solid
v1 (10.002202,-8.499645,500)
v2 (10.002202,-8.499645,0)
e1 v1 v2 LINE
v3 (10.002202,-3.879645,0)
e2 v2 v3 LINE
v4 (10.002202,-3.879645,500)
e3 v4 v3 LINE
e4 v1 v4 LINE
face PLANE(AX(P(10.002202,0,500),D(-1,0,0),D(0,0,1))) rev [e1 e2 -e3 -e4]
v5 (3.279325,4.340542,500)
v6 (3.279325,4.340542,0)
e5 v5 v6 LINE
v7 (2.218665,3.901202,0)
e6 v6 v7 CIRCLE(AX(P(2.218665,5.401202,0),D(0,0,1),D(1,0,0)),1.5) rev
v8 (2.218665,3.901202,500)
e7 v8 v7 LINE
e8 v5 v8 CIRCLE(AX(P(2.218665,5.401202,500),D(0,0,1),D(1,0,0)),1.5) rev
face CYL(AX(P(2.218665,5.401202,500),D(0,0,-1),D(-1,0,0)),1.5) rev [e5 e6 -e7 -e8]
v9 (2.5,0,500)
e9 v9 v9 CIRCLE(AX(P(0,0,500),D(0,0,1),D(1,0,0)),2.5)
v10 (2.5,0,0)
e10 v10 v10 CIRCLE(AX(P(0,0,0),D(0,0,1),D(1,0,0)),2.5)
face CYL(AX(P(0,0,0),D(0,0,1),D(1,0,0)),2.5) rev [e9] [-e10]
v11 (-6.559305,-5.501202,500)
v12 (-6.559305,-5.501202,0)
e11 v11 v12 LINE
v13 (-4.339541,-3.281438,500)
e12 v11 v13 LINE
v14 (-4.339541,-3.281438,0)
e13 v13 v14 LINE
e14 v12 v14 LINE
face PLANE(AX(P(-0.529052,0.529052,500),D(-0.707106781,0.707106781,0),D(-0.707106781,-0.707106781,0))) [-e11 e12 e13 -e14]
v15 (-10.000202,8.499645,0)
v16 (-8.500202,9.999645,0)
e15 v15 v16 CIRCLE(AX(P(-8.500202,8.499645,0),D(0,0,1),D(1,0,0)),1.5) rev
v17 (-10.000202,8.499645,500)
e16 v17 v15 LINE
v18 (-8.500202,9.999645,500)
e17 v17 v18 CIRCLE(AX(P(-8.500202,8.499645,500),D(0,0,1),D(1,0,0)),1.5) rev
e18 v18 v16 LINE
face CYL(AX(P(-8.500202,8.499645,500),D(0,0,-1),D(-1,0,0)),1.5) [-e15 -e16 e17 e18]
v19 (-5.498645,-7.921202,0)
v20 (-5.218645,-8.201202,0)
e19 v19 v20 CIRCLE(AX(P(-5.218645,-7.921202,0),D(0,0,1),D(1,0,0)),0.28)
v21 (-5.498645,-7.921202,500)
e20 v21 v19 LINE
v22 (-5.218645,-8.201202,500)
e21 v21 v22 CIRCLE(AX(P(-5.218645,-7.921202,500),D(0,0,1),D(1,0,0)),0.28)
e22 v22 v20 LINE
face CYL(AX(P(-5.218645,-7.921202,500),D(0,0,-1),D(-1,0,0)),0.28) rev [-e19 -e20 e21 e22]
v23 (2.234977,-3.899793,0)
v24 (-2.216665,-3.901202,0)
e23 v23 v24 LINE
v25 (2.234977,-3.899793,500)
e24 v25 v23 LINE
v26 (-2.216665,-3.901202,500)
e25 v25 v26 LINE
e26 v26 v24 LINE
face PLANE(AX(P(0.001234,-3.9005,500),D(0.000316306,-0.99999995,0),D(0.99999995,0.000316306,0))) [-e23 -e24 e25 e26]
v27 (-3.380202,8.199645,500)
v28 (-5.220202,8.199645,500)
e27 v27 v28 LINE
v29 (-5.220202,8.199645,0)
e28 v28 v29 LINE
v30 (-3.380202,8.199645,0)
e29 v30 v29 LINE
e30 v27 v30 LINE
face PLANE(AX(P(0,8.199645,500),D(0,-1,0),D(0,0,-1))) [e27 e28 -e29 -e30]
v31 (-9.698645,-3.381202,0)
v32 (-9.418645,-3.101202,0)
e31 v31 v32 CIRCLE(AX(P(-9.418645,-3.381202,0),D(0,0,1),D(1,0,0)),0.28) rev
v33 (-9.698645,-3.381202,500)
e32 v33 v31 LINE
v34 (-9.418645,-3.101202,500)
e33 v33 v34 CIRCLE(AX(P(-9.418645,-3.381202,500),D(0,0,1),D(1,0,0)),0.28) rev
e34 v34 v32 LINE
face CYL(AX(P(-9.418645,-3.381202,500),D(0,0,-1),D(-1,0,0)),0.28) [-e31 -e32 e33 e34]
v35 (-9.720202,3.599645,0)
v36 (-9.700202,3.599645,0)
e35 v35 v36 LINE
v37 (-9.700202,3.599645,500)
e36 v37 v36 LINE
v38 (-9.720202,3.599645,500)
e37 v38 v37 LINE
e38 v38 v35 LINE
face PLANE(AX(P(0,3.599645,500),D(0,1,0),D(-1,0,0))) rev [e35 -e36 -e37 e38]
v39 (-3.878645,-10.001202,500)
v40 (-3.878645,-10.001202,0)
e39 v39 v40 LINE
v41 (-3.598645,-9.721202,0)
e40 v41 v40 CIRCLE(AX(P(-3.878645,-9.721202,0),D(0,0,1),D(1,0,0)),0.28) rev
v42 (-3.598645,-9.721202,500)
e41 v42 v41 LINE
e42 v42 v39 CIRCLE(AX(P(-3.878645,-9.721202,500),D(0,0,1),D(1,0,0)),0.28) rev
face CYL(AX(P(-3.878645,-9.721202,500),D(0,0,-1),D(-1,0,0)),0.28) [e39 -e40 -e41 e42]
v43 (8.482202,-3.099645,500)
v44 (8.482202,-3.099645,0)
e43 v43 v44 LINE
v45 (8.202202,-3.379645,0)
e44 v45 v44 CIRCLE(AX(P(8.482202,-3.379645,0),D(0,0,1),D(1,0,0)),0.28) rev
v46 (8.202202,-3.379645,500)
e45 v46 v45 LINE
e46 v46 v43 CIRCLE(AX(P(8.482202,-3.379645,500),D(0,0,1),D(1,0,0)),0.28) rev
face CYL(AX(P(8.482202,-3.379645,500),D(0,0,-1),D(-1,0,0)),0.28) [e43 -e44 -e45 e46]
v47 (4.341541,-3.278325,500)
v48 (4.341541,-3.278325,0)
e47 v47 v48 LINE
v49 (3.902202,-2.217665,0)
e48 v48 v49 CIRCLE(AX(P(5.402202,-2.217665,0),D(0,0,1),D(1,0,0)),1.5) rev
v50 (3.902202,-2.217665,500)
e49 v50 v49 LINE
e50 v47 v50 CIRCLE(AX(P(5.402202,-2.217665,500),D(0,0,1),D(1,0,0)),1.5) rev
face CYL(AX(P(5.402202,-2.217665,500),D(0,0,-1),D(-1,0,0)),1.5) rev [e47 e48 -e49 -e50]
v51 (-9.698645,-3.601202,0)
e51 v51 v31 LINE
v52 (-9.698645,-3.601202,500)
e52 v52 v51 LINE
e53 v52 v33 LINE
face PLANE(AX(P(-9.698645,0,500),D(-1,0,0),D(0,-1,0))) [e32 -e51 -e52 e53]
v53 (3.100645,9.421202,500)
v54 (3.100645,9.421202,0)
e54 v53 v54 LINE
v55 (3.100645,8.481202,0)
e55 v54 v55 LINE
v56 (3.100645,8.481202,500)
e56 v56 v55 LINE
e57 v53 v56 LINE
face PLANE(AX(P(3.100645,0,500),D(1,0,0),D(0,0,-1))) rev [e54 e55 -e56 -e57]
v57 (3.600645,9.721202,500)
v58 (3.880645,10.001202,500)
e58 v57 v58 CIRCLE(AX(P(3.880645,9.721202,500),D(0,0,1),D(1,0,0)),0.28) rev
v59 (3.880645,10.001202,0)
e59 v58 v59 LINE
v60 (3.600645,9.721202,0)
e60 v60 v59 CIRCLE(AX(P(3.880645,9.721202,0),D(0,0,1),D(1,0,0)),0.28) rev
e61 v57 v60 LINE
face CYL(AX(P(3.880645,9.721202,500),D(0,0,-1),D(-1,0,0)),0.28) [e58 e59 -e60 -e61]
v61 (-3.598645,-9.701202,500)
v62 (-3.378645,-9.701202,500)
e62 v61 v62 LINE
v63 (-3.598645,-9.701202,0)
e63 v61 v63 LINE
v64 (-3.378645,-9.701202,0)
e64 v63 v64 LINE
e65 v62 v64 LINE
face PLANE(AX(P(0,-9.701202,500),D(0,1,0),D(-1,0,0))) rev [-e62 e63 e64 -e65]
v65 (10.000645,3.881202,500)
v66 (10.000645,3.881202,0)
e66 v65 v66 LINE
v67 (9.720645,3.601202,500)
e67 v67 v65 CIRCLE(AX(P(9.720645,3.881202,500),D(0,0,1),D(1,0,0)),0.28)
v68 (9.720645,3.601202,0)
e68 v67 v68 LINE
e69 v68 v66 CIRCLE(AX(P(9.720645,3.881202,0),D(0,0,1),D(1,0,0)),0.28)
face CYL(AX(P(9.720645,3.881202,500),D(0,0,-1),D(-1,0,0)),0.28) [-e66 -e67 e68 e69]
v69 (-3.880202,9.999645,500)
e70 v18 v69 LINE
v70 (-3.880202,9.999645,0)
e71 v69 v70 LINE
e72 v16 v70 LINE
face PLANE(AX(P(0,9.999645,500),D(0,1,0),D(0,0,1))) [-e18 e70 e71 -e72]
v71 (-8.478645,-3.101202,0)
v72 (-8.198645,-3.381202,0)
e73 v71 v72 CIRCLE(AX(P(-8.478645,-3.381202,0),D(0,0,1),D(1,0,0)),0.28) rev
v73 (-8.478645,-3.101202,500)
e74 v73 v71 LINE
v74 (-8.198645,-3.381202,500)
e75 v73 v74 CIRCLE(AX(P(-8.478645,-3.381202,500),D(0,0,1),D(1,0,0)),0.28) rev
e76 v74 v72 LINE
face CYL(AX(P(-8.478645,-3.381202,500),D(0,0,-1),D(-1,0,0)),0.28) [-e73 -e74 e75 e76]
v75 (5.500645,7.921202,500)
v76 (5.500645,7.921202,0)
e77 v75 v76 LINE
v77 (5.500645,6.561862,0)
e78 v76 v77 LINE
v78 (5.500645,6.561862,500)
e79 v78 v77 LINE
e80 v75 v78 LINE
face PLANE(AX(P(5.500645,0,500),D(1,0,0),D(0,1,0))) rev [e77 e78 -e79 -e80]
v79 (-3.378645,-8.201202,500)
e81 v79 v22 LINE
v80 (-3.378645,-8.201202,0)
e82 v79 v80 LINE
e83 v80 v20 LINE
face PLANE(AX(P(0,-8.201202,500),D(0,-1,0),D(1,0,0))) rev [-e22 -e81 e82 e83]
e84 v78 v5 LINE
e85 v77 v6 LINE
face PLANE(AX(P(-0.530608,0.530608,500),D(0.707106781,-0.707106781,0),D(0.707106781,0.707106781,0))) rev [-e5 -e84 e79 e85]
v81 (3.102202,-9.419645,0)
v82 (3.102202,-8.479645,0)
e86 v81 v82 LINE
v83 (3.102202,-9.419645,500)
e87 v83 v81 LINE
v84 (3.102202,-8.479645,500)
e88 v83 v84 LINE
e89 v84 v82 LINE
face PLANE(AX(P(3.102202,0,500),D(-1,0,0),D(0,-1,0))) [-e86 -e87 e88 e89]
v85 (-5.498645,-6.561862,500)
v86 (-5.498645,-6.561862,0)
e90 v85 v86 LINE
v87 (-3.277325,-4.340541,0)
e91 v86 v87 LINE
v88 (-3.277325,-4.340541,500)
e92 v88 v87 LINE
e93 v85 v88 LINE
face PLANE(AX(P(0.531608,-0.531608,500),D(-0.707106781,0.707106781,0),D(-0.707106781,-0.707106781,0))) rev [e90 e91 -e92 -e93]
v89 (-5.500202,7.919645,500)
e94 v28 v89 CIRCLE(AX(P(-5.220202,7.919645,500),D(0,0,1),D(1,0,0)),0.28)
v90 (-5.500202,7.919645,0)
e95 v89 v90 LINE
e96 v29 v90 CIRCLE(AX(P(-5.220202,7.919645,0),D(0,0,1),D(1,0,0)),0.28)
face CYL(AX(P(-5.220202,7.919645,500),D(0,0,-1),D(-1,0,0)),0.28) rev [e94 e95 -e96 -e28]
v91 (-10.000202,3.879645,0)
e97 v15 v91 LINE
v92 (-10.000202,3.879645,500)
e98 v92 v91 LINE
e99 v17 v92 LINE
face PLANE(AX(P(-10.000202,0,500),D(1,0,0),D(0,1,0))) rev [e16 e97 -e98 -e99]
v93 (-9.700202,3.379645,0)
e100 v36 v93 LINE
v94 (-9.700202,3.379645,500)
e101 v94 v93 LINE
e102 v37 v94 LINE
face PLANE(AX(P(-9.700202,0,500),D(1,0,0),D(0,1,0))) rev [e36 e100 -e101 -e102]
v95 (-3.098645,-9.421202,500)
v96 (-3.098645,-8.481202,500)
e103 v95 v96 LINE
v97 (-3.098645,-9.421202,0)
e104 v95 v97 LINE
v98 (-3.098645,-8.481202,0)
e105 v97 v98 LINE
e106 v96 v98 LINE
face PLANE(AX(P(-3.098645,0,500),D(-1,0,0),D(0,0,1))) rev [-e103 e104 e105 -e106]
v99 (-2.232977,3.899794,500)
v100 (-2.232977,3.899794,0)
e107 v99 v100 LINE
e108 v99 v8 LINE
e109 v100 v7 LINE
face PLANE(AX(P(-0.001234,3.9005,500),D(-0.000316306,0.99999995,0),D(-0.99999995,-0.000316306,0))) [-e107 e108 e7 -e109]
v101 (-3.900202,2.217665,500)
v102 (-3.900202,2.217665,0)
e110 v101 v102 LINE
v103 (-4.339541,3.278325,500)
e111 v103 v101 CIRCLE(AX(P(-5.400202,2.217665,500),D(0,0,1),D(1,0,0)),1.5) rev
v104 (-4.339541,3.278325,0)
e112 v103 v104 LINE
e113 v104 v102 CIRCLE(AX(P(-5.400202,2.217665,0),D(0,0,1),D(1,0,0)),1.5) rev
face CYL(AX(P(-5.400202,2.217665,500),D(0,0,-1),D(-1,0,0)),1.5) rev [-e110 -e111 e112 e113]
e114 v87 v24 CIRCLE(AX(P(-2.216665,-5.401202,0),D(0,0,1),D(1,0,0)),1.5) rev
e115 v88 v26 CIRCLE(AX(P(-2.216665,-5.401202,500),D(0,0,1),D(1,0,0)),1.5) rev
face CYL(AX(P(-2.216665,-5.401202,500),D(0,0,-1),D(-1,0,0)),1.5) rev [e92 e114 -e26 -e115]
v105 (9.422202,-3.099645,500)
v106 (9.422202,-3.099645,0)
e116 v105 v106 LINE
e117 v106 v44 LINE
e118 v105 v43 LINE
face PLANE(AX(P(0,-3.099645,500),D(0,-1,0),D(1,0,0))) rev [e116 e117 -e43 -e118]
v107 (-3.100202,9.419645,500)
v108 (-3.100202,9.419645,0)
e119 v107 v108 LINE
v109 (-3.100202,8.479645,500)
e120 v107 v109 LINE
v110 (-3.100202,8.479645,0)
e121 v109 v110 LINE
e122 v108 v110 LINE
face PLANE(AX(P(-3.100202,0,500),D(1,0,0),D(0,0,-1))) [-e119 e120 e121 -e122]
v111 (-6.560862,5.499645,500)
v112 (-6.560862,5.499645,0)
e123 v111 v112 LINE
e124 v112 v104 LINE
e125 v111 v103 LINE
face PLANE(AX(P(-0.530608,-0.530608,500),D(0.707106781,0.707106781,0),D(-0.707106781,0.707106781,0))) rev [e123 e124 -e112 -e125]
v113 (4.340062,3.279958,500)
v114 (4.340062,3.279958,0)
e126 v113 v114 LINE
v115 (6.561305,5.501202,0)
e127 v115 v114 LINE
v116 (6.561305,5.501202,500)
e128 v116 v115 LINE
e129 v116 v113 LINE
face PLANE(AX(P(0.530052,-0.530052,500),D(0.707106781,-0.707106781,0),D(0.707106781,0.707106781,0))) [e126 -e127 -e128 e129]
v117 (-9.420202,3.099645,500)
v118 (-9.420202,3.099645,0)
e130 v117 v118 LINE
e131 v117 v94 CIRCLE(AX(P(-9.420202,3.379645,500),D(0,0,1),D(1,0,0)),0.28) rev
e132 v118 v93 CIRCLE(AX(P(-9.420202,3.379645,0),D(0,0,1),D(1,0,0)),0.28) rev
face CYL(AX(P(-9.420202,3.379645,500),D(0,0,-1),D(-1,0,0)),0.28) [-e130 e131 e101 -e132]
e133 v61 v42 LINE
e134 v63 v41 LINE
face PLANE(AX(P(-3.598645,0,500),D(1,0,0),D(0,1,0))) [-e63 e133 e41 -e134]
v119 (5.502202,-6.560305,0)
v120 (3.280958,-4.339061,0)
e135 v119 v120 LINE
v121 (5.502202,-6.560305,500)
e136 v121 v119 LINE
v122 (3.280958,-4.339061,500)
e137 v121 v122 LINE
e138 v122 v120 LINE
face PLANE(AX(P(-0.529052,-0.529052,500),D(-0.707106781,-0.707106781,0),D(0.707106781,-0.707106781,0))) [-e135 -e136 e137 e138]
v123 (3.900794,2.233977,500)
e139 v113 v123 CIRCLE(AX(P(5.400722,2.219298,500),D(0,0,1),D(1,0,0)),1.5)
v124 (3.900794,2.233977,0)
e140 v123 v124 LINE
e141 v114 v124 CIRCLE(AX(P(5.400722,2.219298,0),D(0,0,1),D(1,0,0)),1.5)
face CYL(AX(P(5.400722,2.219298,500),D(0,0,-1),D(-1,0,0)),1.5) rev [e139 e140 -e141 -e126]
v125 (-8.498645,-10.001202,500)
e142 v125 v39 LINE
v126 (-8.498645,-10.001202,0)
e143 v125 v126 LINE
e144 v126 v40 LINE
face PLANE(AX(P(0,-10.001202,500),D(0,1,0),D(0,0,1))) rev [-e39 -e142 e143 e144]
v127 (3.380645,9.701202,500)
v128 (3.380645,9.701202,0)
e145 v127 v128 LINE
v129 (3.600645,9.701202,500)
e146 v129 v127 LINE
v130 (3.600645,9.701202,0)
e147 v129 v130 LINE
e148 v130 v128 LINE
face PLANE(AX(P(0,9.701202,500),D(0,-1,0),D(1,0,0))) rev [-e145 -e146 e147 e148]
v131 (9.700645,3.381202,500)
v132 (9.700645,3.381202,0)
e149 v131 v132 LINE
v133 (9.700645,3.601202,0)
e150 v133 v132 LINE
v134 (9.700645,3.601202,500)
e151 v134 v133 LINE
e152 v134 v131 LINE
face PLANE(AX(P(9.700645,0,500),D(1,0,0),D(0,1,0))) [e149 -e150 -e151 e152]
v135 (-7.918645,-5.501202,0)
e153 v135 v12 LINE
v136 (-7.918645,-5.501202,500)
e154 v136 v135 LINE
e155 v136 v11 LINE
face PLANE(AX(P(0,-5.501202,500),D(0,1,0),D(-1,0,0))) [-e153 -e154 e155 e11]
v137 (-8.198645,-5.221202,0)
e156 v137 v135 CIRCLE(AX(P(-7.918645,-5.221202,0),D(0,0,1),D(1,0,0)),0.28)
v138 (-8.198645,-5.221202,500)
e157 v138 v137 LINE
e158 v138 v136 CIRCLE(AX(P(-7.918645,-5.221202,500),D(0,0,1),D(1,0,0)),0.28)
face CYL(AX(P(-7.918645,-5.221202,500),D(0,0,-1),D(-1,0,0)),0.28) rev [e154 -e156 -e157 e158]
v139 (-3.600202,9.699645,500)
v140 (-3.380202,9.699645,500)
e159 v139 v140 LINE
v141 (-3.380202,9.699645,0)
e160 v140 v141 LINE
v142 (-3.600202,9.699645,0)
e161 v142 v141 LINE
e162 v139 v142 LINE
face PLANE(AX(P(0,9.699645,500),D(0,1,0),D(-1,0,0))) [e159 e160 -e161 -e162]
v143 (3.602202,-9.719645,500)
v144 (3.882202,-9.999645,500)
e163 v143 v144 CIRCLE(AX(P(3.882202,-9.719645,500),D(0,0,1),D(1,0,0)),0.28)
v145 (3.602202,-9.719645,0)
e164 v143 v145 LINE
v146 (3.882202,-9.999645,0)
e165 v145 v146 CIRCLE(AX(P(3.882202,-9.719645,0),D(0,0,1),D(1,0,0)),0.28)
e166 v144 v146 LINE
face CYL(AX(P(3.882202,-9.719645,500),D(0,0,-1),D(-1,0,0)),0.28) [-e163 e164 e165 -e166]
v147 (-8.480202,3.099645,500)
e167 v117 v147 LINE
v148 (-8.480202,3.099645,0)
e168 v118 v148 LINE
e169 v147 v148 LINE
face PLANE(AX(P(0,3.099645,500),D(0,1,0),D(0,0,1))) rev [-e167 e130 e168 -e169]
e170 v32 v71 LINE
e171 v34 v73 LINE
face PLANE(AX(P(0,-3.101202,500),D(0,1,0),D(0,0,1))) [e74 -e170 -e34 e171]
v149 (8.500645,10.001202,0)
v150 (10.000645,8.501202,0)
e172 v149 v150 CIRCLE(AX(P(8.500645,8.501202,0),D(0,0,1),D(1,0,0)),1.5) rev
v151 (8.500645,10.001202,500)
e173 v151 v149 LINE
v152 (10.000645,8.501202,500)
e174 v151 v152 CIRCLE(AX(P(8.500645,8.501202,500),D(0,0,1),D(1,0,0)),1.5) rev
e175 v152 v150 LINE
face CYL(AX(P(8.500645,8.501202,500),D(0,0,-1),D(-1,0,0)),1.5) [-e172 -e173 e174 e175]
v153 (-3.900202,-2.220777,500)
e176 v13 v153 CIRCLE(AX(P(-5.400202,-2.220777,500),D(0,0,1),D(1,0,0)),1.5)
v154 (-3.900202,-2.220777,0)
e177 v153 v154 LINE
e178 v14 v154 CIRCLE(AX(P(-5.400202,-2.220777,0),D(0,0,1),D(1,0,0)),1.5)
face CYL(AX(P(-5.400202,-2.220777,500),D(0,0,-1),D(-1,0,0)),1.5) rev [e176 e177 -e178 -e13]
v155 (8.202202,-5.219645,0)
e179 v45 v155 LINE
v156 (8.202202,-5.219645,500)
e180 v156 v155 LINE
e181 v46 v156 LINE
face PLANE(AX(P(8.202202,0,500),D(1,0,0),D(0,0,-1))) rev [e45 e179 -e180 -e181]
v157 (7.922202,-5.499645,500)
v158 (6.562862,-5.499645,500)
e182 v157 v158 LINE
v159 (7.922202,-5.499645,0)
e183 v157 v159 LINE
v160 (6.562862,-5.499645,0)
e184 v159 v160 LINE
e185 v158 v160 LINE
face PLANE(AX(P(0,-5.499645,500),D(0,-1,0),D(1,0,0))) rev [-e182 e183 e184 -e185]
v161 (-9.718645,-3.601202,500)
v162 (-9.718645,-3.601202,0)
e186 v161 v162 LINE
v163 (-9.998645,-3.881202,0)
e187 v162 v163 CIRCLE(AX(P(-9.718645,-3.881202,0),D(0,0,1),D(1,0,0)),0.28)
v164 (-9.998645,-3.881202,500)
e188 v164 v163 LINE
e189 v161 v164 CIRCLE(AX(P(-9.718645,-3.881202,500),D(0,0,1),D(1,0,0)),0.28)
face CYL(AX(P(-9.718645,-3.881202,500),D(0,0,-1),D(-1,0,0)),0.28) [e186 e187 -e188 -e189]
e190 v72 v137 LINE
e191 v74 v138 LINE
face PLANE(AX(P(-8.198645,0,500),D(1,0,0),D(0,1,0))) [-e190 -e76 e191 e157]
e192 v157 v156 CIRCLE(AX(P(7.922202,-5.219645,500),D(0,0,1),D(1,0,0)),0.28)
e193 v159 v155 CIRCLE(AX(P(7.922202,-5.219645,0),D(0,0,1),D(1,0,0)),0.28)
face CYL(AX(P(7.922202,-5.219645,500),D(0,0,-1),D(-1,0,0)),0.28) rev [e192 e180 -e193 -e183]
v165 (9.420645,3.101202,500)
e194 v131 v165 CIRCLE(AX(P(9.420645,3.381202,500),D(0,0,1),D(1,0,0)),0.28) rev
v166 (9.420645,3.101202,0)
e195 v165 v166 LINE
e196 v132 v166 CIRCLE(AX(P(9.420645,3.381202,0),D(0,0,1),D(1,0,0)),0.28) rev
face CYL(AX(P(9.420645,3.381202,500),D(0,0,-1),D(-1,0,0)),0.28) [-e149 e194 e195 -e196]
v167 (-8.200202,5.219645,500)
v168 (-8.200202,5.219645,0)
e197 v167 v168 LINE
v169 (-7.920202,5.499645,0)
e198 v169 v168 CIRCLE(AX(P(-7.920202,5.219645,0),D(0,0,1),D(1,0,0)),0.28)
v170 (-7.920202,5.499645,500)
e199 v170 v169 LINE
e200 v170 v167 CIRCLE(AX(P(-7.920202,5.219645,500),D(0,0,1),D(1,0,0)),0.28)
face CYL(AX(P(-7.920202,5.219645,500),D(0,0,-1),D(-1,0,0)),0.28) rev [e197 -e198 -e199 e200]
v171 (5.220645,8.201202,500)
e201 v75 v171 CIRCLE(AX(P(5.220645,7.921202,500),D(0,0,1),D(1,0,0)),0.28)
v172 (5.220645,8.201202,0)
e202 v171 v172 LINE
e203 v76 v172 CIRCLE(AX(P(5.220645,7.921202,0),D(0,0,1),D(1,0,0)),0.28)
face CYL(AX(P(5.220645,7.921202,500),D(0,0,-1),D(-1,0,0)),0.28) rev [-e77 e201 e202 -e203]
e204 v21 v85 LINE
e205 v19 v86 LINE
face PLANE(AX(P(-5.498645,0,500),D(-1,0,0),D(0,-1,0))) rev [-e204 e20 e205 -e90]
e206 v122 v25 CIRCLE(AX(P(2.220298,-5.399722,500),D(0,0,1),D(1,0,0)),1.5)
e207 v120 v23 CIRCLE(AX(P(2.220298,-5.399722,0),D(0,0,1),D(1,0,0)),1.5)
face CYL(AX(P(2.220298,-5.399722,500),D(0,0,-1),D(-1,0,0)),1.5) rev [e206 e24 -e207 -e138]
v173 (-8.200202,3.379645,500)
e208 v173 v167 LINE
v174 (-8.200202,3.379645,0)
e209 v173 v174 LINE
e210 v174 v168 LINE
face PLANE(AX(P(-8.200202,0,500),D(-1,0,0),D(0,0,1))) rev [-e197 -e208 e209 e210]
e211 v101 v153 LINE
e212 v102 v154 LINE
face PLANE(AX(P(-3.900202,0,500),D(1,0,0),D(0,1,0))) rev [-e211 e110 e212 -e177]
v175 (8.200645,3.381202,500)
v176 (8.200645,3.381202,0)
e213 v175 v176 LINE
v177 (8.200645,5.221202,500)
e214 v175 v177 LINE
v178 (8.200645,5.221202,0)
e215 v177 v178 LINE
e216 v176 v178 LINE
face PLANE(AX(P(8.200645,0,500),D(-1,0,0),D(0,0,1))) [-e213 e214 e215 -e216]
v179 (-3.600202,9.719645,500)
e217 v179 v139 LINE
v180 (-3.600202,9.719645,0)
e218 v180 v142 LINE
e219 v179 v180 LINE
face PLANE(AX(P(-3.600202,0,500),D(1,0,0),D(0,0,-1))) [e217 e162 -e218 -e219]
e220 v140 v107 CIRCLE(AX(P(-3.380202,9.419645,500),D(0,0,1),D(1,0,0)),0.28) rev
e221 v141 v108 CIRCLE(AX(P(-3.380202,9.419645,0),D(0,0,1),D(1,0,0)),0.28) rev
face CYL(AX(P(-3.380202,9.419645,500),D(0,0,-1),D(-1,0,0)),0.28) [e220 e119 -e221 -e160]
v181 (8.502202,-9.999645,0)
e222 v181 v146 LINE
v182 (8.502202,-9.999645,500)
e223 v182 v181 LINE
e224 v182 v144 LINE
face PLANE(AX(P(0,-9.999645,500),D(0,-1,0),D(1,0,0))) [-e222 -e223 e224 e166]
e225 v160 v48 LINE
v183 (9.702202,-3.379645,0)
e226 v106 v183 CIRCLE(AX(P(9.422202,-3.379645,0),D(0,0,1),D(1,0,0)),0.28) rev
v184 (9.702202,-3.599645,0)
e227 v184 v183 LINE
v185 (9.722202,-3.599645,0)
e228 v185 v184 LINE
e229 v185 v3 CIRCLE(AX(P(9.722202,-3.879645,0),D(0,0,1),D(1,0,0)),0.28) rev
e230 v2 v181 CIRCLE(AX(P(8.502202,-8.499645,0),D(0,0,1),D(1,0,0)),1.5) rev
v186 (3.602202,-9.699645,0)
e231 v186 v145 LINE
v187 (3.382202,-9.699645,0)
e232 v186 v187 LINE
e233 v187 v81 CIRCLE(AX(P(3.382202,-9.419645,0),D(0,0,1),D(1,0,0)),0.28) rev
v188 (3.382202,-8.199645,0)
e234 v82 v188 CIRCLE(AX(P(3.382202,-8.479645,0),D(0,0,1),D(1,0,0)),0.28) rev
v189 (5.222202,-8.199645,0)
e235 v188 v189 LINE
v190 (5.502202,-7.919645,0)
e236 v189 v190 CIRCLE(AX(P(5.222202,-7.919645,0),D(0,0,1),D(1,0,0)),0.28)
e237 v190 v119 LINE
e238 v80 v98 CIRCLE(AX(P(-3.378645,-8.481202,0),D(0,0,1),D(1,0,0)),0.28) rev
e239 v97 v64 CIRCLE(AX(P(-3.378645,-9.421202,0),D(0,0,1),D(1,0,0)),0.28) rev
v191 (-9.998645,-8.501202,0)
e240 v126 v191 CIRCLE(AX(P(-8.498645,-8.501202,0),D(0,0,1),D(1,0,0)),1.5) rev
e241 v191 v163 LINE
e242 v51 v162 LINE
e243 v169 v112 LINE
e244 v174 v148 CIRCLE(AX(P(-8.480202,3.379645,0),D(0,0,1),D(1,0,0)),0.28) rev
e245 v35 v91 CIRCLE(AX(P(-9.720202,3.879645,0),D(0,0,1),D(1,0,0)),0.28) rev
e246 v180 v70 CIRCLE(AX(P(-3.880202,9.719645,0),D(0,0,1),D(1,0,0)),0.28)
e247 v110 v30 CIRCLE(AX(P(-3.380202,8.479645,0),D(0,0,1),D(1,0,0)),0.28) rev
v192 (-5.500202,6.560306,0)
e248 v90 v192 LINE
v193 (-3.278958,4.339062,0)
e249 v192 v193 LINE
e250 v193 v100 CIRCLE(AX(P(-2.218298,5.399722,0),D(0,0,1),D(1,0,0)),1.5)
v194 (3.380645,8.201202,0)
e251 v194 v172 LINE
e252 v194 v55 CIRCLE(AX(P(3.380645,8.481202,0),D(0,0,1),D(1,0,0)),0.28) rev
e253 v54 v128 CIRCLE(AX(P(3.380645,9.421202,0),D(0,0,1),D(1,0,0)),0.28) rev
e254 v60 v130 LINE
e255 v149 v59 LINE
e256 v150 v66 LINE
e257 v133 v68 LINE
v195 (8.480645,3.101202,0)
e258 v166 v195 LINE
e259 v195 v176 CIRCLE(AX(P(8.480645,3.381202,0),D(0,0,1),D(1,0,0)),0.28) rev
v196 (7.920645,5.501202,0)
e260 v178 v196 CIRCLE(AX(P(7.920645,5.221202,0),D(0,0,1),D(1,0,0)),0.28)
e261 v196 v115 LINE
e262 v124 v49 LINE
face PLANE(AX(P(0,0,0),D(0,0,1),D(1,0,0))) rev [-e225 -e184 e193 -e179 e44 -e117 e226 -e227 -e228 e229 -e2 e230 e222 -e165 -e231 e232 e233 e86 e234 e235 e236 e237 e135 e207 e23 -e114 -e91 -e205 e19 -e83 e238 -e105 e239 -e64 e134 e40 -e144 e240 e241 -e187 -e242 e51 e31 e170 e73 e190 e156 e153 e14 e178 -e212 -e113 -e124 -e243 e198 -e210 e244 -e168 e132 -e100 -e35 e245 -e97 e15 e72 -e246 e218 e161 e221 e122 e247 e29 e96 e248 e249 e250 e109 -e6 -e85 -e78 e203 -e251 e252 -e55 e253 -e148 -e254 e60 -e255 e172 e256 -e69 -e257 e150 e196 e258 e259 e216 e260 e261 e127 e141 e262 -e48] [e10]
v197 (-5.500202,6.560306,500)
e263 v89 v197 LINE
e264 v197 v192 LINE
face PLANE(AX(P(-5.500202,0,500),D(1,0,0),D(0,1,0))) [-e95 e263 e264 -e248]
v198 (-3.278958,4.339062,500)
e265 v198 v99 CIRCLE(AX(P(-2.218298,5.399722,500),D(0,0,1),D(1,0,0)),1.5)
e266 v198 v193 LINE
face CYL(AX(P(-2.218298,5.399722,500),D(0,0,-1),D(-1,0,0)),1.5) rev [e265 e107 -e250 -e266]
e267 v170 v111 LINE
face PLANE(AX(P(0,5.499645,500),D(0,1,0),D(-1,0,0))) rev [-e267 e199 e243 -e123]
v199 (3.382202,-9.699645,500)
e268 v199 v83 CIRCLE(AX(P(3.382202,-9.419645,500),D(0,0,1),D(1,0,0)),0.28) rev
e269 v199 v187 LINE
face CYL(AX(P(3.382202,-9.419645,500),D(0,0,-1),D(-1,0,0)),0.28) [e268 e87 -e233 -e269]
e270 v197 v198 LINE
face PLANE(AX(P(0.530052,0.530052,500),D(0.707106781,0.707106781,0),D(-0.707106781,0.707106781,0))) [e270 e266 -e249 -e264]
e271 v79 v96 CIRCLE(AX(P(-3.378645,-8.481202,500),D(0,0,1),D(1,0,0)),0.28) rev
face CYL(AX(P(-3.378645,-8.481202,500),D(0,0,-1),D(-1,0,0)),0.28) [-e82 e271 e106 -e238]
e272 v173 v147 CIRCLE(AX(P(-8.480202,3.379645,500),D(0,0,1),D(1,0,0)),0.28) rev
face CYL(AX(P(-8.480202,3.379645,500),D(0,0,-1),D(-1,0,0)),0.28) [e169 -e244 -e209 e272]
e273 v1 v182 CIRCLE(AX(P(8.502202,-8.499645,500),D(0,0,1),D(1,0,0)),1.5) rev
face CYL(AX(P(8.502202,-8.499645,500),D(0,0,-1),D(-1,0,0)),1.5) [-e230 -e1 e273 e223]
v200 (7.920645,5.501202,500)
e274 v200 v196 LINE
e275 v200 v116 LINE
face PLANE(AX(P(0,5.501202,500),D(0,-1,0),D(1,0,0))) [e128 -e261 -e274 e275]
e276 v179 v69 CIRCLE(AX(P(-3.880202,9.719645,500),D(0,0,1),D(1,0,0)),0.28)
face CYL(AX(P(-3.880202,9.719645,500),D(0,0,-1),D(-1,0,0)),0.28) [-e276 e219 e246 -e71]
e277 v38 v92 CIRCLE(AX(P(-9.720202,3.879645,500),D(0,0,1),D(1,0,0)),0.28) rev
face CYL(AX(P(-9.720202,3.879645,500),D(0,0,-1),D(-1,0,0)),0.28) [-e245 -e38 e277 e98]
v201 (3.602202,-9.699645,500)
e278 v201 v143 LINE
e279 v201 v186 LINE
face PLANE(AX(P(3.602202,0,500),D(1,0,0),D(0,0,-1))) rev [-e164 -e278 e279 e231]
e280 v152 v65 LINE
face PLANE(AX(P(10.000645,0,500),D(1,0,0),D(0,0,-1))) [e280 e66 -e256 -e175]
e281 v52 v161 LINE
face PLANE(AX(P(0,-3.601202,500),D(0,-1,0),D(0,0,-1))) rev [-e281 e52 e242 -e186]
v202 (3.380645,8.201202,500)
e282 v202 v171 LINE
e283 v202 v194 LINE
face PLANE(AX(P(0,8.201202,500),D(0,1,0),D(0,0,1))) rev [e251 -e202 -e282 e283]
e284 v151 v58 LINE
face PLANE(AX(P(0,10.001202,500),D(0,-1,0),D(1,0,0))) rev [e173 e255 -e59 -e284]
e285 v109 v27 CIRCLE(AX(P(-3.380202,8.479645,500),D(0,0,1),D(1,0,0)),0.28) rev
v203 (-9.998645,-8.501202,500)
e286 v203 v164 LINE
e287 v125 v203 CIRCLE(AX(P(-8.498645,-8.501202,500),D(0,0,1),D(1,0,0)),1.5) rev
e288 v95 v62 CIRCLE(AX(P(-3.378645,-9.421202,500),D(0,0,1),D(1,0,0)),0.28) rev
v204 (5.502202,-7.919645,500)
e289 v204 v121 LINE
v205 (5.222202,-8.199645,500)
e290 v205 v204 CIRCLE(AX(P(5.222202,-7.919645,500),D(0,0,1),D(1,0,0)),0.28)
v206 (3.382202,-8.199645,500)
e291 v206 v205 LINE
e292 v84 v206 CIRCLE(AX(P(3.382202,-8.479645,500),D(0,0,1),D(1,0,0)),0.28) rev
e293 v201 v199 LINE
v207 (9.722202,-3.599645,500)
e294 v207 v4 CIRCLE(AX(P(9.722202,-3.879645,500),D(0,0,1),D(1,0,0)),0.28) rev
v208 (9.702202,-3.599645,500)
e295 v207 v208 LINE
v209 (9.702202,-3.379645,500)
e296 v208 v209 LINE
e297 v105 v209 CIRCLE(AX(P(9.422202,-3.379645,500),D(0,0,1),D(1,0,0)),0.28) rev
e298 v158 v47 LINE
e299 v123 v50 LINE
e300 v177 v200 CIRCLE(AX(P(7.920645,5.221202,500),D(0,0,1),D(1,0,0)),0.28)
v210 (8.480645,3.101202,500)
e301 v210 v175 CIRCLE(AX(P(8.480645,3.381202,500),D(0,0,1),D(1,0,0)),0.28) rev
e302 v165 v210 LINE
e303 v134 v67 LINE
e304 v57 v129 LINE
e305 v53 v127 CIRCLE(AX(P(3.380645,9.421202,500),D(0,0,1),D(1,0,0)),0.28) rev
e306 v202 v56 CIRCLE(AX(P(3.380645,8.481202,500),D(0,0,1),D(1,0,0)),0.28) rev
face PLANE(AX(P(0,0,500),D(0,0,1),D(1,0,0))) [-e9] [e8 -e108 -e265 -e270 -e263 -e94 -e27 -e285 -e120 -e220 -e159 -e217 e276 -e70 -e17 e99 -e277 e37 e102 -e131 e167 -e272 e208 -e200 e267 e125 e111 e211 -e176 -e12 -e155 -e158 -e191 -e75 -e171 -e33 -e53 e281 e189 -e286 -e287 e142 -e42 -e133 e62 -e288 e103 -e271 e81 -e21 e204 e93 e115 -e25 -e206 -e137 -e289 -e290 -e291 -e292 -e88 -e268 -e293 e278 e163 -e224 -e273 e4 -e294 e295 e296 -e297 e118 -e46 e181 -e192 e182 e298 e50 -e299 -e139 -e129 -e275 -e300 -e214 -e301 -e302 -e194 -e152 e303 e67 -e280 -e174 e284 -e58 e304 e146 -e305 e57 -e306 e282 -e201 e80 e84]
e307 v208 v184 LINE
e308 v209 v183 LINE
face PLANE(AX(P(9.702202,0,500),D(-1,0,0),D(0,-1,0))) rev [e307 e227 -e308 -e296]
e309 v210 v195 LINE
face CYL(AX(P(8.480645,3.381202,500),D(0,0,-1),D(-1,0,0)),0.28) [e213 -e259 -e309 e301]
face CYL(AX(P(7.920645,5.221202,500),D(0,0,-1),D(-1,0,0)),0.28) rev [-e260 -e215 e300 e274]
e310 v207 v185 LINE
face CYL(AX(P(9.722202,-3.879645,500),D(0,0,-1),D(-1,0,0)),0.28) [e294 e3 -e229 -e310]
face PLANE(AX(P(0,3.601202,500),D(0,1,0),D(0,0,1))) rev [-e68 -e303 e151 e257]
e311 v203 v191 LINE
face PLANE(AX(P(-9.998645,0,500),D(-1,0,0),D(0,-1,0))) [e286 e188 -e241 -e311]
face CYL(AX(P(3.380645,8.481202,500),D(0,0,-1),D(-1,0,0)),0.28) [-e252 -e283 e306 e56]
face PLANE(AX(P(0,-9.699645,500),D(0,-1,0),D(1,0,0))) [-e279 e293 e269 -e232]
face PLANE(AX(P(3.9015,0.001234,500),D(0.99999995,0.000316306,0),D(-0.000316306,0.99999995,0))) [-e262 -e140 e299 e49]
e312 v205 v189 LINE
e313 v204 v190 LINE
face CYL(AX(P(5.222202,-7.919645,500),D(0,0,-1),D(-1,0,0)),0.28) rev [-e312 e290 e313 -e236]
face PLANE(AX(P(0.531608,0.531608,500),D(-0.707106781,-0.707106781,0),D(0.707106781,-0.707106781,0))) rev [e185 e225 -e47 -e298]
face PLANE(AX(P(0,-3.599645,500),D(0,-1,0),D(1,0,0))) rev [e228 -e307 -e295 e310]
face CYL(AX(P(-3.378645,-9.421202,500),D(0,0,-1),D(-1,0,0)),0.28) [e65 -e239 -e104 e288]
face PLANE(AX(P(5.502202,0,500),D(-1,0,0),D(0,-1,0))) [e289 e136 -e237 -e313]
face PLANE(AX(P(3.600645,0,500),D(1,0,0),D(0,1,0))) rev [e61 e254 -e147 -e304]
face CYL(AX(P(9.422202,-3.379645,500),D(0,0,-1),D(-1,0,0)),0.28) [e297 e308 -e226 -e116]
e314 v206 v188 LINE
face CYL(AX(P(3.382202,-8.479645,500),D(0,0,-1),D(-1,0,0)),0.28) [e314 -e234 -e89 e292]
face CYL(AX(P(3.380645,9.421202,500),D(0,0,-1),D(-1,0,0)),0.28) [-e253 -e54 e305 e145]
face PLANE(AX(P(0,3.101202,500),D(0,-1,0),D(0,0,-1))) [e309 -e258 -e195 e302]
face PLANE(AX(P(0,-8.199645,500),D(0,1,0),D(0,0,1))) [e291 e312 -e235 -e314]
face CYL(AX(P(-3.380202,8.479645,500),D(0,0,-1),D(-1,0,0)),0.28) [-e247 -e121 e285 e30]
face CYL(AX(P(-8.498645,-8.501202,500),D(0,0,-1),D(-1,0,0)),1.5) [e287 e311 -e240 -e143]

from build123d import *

# Parameters (mm, degrees)
BOSS_EXTRUDE1_DEPTH = 500
F_3DSKETCH2_R       = 2.5
CUT_EXTRUDE1_DEPTH  = 501.200028064


with BuildPart() as part:
    # Sketch1 → Boss-Extrude1 (new body)
    with BuildSketch(Plane.XY):
        with BuildLine():
            ThreePointArc((-4.339541497, 3.27832502), (-4.01438237, 2.791689997), (-3.900201668, 2.217664848))
            Line((-3.900201668, 2.217664848), (-3.900201668, -2.220777458))
            ThreePointArc((-3.900201668, -2.220777458), (-4.013982246, -2.793835668), (-4.338062619, -3.279956687))
            ThreePointArc((-4.338062619, -3.279956687), (-4.338801799, -3.280697416), (-4.339541497, -3.28143763))
            Line((-4.339541497, -3.28143763), (-6.559305445, -5.501201578))
            Line((-6.559305445, -5.501201578), (-7.918645273, -5.501201578))
            ThreePointArc((-7.918645273, -5.501201578), (-8.116635172, -5.419191476), (-8.198645273, -5.221201578))
            Line((-8.198645273, -5.221201578), (-8.198645273, -3.381201578))
            ThreePointArc((-8.198645273, -3.381201578), (-8.280655374, -3.183211679), (-8.478645273, -3.101201578))
            Line((-8.478645273, -3.101201578), (-9.418645273, -3.101201578))
            ThreePointArc((-9.418645273, -3.101201578), (-9.616635172, -3.183211679), (-9.698645273, -3.381201578))
            Line((-9.698645273, -3.381201578), (-9.698645273, -3.601201578))
            Line((-9.698645273, -3.601201578), (-9.718645273, -3.601201578))
            ThreePointArc((-9.718645273, -3.601201578), (-9.916635172, -3.683211679), (-9.998645273, -3.881201578))
            Line((-9.998645273, -3.881201578), (-9.998645273, -8.501201578))
            ThreePointArc((-9.998645273, -8.501201578), (-9.559305445, -9.561861749), (-8.498645273, -10.001201578))
            Line((-8.498645273, -10.001201578), (-3.878645273, -10.001201578))
            ThreePointArc((-3.878645273, -10.001201578), (-3.680655374, -9.919191476), (-3.598645273, -9.721201578))
            Line((-3.598645273, -9.721201578), (-3.598645273, -9.701201578))
            Line((-3.598645273, -9.701201578), (-3.378645273, -9.701201578))
            ThreePointArc((-3.378645273, -9.701201578), (-3.180655374, -9.619191476), (-3.098645273, -9.421201578))
            Line((-3.098645273, -9.421201578), (-3.098645273, -8.481201578))
            ThreePointArc((-3.098645273, -8.481201578), (-3.180655374, -8.283211679), (-3.378645273, -8.201201578))
            Line((-3.378645273, -8.201201578), (-5.218645273, -8.201201578))
            ThreePointArc((-5.218645273, -8.201201578), (-5.416635172, -8.119191476), (-5.498645273, -7.921201578))
            Line((-5.498645273, -7.921201578), (-5.498645273, -6.561861749))
            Line((-5.498645273, -6.561861749), (-3.277324929, -4.340541406))
            ThreePointArc((-3.277324929, -4.340541406), (-2.790689906, -4.015382279), (-2.216664757, -3.901201578))
            Line((-2.216664757, -3.901201578), (2.234977304, -3.899793498))
            ThreePointArc((2.234977304, -3.899793498), (2.801097117, -4.016727825), (3.280957809, -4.339061494))
            Line((3.280957809, -4.339061494), (5.502201668, -6.560305354))
            Line((5.502201668, -6.560305354), (5.502201668, -7.919645182))
            ThreePointArc((5.502201668, -7.919645182), (5.420191567, -8.117635081), (5.222201668, -8.199645182))
            Line((5.222201668, -8.199645182), (3.382201668, -8.199645182))
            ThreePointArc((3.382201668, -8.199645182), (3.18421177, -8.281655283), (3.102201668, -8.479645182))
            Line((3.102201668, -8.479645182), (3.102201668, -9.419645182))
            ThreePointArc((3.102201668, -9.419645182), (3.18421177, -9.617635081), (3.382201668, -9.699645182))
            Line((3.382201668, -9.699645182), (3.602201668, -9.699645182))
            Line((3.602201668, -9.699645182), (3.602201668, -9.719645182))
            ThreePointArc((3.602201668, -9.719645182), (3.68421177, -9.917635081), (3.882201668, -9.999645182))
            Line((3.882201668, -9.999645182), (8.502201668, -9.999645182))
            ThreePointArc((8.502201668, -9.999645182), (9.56286184, -9.560305354), (10.002201668, -8.499645182))
            Line((10.002201668, -8.499645182), (10.002201668, -3.879645182))
            ThreePointArc((10.002201668, -3.879645182), (9.920191567, -3.681655283), (9.722201668, -3.599645182))
            Line((9.722201668, -3.599645182), (9.702201668, -3.599645182))
            Line((9.702201668, -3.599645182), (9.702201668, -3.379645182))
            ThreePointArc((9.702201668, -3.379645182), (9.620191567, -3.181655283), (9.422201668, -3.099645182))
            Line((9.422201668, -3.099645182), (8.482201668, -3.099645182))
            ThreePointArc((8.482201668, -3.099645182), (8.28421177, -3.181655283), (8.202201668, -3.379645182))
            Line((8.202201668, -3.379645182), (8.202201668, -5.219645182))
            ThreePointArc((8.202201668, -5.219645182), (8.120191567, -5.417635081), (7.922201668, -5.499645182))
            Line((7.922201668, -5.499645182), (6.56286184, -5.499645182))
            Line((6.56286184, -5.499645182), (4.341541497, -3.278324838))
            ThreePointArc((4.341541497, -3.278324838), (4.01638237, -2.791689815), (3.902201668, -2.217664667))
            Line((3.902201668, -2.217664667), (3.900793589, 2.233977395))
            ThreePointArc((3.900793589, 2.233977395), (4.017727916, 2.800097207), (4.340061585, 3.2799579))
            Line((4.340061585, 3.2799579), (6.561305445, 5.501201759))
            Line((6.561305445, 5.501201759), (7.920645273, 5.501201759))
            ThreePointArc((7.920645273, 5.501201759), (8.118635172, 5.419191658), (8.200645273, 5.221201759))
            Line((8.200645273, 5.221201759), (8.200645273, 3.381201759))
            ThreePointArc((8.200645273, 3.381201759), (8.282655374, 3.183211861), (8.480645273, 3.101201759))
            Line((8.480645273, 3.101201759), (9.420645273, 3.101201759))
            ThreePointArc((9.420645273, 3.101201759), (9.618635172, 3.183211861), (9.700645273, 3.381201759))
            Line((9.700645273, 3.381201759), (9.700645273, 3.601201759))
            Line((9.700645273, 3.601201759), (9.720645273, 3.601201759))
            ThreePointArc((9.720645273, 3.601201759), (9.918635172, 3.683211861), (10.000645273, 3.881201759))
            Line((10.000645273, 3.881201759), (10.000645273, 8.501201759))
            ThreePointArc((10.000645273, 8.501201759), (9.561305445, 9.561861931), (8.500645273, 10.001201759))
            Line((8.500645273, 10.001201759), (3.880645273, 10.001201759))
            ThreePointArc((3.880645273, 10.001201759), (3.682655374, 9.919191658), (3.600645273, 9.721201759))
            Line((3.600645273, 9.721201759), (3.600645273, 9.701201759))
            Line((3.600645273, 9.701201759), (3.380645273, 9.701201759))
            ThreePointArc((3.380645273, 9.701201759), (3.182655374, 9.619191658), (3.100645273, 9.421201759))
            Line((3.100645273, 9.421201759), (3.100645273, 8.481201759))
            ThreePointArc((3.100645273, 8.481201759), (3.182655374, 8.283211861), (3.380645273, 8.201201759))
            Line((3.380645273, 8.201201759), (5.220645273, 8.201201759))
            ThreePointArc((5.220645273, 8.201201759), (5.418635172, 8.119191658), (5.500645273, 7.921201759))
            Line((5.500645273, 7.921201759), (5.500645273, 6.561861931))
            Line((5.500645273, 6.561861931), (3.279324929, 4.340541588))
            ThreePointArc((3.279324929, 4.340541588), (2.792689906, 4.015382461), (2.218664757, 3.901201759))
            Line((2.218664757, 3.901201759), (-2.232977304, 3.89979368))
            ThreePointArc((-2.232977304, 3.89979368), (-2.799097117, 4.016728006), (-3.278957809, 4.339061676))
            Line((-3.278957809, 4.339061676), (-5.500201668, 6.560305535))
            Line((-5.500201668, 6.560305535), (-5.500201668, 7.919645364))
            ThreePointArc((-5.500201668, 7.919645364), (-5.418191567, 8.117635262), (-5.220201668, 8.199645364))
            Line((-5.220201668, 8.199645364), (-3.380201668, 8.199645364))
            ThreePointArc((-3.380201668, 8.199645364), (-3.18221177, 8.281655465), (-3.100201668, 8.479645364))
            Line((-3.100201668, 8.479645364), (-3.100201668, 9.419645364))
            ThreePointArc((-3.100201668, 9.419645364), (-3.18221177, 9.617635262), (-3.380201668, 9.699645364))
            Line((-3.380201668, 9.699645364), (-3.600201668, 9.699645364))
            Line((-3.600201668, 9.699645364), (-3.600201668, 9.719645364))
            ThreePointArc((-3.600201668, 9.719645364), (-3.68221177, 9.917635262), (-3.880201668, 9.999645364))
            Line((-3.880201668, 9.999645364), (-8.500201668, 9.999645364))
            ThreePointArc((-8.500201668, 9.999645364), (-9.56086184, 9.560305535), (-10.000201668, 8.499645364))
            Line((-10.000201668, 8.499645364), (-10.000201668, 3.879645364))
            ThreePointArc((-10.000201668, 3.879645364), (-9.918191567, 3.681655465), (-9.720201668, 3.599645364))
            Line((-9.720201668, 3.599645364), (-9.700201668, 3.599645364))
            Line((-9.700201668, 3.599645364), (-9.700201668, 3.379645364))
            ThreePointArc((-9.700201668, 3.379645364), (-9.618191567, 3.181655465), (-9.420201668, 3.099645364))
            Line((-9.420201668, 3.099645364), (-8.480201668, 3.099645364))
            ThreePointArc((-8.480201668, 3.099645364), (-8.28221177, 3.181655465), (-8.200201668, 3.379645364))
            Line((-8.200201668, 3.379645364), (-8.200201668, 5.219645364))
            ThreePointArc((-8.200201668, 5.219645364), (-8.118191567, 5.417635262), (-7.920201668, 5.499645364))
            Line((-7.920201668, 5.499645364), (-6.56086184, 5.499645364))
            Line((-6.56086184, 5.499645364), (-4.339541497, 3.27832502))
        make_face()
    extrude(amount=BOSS_EXTRUDE1_DEPTH)

    # 3DSketch2 → Cut-Extrude1 (cut, through all)
    with BuildSketch(Plane.XY):
        Circle(F_3DSKETCH2_R)
    extrude(amount=CUT_EXTRUDE1_DEPTH, mode=Mode.SUBTRACT)


solid = part.part
